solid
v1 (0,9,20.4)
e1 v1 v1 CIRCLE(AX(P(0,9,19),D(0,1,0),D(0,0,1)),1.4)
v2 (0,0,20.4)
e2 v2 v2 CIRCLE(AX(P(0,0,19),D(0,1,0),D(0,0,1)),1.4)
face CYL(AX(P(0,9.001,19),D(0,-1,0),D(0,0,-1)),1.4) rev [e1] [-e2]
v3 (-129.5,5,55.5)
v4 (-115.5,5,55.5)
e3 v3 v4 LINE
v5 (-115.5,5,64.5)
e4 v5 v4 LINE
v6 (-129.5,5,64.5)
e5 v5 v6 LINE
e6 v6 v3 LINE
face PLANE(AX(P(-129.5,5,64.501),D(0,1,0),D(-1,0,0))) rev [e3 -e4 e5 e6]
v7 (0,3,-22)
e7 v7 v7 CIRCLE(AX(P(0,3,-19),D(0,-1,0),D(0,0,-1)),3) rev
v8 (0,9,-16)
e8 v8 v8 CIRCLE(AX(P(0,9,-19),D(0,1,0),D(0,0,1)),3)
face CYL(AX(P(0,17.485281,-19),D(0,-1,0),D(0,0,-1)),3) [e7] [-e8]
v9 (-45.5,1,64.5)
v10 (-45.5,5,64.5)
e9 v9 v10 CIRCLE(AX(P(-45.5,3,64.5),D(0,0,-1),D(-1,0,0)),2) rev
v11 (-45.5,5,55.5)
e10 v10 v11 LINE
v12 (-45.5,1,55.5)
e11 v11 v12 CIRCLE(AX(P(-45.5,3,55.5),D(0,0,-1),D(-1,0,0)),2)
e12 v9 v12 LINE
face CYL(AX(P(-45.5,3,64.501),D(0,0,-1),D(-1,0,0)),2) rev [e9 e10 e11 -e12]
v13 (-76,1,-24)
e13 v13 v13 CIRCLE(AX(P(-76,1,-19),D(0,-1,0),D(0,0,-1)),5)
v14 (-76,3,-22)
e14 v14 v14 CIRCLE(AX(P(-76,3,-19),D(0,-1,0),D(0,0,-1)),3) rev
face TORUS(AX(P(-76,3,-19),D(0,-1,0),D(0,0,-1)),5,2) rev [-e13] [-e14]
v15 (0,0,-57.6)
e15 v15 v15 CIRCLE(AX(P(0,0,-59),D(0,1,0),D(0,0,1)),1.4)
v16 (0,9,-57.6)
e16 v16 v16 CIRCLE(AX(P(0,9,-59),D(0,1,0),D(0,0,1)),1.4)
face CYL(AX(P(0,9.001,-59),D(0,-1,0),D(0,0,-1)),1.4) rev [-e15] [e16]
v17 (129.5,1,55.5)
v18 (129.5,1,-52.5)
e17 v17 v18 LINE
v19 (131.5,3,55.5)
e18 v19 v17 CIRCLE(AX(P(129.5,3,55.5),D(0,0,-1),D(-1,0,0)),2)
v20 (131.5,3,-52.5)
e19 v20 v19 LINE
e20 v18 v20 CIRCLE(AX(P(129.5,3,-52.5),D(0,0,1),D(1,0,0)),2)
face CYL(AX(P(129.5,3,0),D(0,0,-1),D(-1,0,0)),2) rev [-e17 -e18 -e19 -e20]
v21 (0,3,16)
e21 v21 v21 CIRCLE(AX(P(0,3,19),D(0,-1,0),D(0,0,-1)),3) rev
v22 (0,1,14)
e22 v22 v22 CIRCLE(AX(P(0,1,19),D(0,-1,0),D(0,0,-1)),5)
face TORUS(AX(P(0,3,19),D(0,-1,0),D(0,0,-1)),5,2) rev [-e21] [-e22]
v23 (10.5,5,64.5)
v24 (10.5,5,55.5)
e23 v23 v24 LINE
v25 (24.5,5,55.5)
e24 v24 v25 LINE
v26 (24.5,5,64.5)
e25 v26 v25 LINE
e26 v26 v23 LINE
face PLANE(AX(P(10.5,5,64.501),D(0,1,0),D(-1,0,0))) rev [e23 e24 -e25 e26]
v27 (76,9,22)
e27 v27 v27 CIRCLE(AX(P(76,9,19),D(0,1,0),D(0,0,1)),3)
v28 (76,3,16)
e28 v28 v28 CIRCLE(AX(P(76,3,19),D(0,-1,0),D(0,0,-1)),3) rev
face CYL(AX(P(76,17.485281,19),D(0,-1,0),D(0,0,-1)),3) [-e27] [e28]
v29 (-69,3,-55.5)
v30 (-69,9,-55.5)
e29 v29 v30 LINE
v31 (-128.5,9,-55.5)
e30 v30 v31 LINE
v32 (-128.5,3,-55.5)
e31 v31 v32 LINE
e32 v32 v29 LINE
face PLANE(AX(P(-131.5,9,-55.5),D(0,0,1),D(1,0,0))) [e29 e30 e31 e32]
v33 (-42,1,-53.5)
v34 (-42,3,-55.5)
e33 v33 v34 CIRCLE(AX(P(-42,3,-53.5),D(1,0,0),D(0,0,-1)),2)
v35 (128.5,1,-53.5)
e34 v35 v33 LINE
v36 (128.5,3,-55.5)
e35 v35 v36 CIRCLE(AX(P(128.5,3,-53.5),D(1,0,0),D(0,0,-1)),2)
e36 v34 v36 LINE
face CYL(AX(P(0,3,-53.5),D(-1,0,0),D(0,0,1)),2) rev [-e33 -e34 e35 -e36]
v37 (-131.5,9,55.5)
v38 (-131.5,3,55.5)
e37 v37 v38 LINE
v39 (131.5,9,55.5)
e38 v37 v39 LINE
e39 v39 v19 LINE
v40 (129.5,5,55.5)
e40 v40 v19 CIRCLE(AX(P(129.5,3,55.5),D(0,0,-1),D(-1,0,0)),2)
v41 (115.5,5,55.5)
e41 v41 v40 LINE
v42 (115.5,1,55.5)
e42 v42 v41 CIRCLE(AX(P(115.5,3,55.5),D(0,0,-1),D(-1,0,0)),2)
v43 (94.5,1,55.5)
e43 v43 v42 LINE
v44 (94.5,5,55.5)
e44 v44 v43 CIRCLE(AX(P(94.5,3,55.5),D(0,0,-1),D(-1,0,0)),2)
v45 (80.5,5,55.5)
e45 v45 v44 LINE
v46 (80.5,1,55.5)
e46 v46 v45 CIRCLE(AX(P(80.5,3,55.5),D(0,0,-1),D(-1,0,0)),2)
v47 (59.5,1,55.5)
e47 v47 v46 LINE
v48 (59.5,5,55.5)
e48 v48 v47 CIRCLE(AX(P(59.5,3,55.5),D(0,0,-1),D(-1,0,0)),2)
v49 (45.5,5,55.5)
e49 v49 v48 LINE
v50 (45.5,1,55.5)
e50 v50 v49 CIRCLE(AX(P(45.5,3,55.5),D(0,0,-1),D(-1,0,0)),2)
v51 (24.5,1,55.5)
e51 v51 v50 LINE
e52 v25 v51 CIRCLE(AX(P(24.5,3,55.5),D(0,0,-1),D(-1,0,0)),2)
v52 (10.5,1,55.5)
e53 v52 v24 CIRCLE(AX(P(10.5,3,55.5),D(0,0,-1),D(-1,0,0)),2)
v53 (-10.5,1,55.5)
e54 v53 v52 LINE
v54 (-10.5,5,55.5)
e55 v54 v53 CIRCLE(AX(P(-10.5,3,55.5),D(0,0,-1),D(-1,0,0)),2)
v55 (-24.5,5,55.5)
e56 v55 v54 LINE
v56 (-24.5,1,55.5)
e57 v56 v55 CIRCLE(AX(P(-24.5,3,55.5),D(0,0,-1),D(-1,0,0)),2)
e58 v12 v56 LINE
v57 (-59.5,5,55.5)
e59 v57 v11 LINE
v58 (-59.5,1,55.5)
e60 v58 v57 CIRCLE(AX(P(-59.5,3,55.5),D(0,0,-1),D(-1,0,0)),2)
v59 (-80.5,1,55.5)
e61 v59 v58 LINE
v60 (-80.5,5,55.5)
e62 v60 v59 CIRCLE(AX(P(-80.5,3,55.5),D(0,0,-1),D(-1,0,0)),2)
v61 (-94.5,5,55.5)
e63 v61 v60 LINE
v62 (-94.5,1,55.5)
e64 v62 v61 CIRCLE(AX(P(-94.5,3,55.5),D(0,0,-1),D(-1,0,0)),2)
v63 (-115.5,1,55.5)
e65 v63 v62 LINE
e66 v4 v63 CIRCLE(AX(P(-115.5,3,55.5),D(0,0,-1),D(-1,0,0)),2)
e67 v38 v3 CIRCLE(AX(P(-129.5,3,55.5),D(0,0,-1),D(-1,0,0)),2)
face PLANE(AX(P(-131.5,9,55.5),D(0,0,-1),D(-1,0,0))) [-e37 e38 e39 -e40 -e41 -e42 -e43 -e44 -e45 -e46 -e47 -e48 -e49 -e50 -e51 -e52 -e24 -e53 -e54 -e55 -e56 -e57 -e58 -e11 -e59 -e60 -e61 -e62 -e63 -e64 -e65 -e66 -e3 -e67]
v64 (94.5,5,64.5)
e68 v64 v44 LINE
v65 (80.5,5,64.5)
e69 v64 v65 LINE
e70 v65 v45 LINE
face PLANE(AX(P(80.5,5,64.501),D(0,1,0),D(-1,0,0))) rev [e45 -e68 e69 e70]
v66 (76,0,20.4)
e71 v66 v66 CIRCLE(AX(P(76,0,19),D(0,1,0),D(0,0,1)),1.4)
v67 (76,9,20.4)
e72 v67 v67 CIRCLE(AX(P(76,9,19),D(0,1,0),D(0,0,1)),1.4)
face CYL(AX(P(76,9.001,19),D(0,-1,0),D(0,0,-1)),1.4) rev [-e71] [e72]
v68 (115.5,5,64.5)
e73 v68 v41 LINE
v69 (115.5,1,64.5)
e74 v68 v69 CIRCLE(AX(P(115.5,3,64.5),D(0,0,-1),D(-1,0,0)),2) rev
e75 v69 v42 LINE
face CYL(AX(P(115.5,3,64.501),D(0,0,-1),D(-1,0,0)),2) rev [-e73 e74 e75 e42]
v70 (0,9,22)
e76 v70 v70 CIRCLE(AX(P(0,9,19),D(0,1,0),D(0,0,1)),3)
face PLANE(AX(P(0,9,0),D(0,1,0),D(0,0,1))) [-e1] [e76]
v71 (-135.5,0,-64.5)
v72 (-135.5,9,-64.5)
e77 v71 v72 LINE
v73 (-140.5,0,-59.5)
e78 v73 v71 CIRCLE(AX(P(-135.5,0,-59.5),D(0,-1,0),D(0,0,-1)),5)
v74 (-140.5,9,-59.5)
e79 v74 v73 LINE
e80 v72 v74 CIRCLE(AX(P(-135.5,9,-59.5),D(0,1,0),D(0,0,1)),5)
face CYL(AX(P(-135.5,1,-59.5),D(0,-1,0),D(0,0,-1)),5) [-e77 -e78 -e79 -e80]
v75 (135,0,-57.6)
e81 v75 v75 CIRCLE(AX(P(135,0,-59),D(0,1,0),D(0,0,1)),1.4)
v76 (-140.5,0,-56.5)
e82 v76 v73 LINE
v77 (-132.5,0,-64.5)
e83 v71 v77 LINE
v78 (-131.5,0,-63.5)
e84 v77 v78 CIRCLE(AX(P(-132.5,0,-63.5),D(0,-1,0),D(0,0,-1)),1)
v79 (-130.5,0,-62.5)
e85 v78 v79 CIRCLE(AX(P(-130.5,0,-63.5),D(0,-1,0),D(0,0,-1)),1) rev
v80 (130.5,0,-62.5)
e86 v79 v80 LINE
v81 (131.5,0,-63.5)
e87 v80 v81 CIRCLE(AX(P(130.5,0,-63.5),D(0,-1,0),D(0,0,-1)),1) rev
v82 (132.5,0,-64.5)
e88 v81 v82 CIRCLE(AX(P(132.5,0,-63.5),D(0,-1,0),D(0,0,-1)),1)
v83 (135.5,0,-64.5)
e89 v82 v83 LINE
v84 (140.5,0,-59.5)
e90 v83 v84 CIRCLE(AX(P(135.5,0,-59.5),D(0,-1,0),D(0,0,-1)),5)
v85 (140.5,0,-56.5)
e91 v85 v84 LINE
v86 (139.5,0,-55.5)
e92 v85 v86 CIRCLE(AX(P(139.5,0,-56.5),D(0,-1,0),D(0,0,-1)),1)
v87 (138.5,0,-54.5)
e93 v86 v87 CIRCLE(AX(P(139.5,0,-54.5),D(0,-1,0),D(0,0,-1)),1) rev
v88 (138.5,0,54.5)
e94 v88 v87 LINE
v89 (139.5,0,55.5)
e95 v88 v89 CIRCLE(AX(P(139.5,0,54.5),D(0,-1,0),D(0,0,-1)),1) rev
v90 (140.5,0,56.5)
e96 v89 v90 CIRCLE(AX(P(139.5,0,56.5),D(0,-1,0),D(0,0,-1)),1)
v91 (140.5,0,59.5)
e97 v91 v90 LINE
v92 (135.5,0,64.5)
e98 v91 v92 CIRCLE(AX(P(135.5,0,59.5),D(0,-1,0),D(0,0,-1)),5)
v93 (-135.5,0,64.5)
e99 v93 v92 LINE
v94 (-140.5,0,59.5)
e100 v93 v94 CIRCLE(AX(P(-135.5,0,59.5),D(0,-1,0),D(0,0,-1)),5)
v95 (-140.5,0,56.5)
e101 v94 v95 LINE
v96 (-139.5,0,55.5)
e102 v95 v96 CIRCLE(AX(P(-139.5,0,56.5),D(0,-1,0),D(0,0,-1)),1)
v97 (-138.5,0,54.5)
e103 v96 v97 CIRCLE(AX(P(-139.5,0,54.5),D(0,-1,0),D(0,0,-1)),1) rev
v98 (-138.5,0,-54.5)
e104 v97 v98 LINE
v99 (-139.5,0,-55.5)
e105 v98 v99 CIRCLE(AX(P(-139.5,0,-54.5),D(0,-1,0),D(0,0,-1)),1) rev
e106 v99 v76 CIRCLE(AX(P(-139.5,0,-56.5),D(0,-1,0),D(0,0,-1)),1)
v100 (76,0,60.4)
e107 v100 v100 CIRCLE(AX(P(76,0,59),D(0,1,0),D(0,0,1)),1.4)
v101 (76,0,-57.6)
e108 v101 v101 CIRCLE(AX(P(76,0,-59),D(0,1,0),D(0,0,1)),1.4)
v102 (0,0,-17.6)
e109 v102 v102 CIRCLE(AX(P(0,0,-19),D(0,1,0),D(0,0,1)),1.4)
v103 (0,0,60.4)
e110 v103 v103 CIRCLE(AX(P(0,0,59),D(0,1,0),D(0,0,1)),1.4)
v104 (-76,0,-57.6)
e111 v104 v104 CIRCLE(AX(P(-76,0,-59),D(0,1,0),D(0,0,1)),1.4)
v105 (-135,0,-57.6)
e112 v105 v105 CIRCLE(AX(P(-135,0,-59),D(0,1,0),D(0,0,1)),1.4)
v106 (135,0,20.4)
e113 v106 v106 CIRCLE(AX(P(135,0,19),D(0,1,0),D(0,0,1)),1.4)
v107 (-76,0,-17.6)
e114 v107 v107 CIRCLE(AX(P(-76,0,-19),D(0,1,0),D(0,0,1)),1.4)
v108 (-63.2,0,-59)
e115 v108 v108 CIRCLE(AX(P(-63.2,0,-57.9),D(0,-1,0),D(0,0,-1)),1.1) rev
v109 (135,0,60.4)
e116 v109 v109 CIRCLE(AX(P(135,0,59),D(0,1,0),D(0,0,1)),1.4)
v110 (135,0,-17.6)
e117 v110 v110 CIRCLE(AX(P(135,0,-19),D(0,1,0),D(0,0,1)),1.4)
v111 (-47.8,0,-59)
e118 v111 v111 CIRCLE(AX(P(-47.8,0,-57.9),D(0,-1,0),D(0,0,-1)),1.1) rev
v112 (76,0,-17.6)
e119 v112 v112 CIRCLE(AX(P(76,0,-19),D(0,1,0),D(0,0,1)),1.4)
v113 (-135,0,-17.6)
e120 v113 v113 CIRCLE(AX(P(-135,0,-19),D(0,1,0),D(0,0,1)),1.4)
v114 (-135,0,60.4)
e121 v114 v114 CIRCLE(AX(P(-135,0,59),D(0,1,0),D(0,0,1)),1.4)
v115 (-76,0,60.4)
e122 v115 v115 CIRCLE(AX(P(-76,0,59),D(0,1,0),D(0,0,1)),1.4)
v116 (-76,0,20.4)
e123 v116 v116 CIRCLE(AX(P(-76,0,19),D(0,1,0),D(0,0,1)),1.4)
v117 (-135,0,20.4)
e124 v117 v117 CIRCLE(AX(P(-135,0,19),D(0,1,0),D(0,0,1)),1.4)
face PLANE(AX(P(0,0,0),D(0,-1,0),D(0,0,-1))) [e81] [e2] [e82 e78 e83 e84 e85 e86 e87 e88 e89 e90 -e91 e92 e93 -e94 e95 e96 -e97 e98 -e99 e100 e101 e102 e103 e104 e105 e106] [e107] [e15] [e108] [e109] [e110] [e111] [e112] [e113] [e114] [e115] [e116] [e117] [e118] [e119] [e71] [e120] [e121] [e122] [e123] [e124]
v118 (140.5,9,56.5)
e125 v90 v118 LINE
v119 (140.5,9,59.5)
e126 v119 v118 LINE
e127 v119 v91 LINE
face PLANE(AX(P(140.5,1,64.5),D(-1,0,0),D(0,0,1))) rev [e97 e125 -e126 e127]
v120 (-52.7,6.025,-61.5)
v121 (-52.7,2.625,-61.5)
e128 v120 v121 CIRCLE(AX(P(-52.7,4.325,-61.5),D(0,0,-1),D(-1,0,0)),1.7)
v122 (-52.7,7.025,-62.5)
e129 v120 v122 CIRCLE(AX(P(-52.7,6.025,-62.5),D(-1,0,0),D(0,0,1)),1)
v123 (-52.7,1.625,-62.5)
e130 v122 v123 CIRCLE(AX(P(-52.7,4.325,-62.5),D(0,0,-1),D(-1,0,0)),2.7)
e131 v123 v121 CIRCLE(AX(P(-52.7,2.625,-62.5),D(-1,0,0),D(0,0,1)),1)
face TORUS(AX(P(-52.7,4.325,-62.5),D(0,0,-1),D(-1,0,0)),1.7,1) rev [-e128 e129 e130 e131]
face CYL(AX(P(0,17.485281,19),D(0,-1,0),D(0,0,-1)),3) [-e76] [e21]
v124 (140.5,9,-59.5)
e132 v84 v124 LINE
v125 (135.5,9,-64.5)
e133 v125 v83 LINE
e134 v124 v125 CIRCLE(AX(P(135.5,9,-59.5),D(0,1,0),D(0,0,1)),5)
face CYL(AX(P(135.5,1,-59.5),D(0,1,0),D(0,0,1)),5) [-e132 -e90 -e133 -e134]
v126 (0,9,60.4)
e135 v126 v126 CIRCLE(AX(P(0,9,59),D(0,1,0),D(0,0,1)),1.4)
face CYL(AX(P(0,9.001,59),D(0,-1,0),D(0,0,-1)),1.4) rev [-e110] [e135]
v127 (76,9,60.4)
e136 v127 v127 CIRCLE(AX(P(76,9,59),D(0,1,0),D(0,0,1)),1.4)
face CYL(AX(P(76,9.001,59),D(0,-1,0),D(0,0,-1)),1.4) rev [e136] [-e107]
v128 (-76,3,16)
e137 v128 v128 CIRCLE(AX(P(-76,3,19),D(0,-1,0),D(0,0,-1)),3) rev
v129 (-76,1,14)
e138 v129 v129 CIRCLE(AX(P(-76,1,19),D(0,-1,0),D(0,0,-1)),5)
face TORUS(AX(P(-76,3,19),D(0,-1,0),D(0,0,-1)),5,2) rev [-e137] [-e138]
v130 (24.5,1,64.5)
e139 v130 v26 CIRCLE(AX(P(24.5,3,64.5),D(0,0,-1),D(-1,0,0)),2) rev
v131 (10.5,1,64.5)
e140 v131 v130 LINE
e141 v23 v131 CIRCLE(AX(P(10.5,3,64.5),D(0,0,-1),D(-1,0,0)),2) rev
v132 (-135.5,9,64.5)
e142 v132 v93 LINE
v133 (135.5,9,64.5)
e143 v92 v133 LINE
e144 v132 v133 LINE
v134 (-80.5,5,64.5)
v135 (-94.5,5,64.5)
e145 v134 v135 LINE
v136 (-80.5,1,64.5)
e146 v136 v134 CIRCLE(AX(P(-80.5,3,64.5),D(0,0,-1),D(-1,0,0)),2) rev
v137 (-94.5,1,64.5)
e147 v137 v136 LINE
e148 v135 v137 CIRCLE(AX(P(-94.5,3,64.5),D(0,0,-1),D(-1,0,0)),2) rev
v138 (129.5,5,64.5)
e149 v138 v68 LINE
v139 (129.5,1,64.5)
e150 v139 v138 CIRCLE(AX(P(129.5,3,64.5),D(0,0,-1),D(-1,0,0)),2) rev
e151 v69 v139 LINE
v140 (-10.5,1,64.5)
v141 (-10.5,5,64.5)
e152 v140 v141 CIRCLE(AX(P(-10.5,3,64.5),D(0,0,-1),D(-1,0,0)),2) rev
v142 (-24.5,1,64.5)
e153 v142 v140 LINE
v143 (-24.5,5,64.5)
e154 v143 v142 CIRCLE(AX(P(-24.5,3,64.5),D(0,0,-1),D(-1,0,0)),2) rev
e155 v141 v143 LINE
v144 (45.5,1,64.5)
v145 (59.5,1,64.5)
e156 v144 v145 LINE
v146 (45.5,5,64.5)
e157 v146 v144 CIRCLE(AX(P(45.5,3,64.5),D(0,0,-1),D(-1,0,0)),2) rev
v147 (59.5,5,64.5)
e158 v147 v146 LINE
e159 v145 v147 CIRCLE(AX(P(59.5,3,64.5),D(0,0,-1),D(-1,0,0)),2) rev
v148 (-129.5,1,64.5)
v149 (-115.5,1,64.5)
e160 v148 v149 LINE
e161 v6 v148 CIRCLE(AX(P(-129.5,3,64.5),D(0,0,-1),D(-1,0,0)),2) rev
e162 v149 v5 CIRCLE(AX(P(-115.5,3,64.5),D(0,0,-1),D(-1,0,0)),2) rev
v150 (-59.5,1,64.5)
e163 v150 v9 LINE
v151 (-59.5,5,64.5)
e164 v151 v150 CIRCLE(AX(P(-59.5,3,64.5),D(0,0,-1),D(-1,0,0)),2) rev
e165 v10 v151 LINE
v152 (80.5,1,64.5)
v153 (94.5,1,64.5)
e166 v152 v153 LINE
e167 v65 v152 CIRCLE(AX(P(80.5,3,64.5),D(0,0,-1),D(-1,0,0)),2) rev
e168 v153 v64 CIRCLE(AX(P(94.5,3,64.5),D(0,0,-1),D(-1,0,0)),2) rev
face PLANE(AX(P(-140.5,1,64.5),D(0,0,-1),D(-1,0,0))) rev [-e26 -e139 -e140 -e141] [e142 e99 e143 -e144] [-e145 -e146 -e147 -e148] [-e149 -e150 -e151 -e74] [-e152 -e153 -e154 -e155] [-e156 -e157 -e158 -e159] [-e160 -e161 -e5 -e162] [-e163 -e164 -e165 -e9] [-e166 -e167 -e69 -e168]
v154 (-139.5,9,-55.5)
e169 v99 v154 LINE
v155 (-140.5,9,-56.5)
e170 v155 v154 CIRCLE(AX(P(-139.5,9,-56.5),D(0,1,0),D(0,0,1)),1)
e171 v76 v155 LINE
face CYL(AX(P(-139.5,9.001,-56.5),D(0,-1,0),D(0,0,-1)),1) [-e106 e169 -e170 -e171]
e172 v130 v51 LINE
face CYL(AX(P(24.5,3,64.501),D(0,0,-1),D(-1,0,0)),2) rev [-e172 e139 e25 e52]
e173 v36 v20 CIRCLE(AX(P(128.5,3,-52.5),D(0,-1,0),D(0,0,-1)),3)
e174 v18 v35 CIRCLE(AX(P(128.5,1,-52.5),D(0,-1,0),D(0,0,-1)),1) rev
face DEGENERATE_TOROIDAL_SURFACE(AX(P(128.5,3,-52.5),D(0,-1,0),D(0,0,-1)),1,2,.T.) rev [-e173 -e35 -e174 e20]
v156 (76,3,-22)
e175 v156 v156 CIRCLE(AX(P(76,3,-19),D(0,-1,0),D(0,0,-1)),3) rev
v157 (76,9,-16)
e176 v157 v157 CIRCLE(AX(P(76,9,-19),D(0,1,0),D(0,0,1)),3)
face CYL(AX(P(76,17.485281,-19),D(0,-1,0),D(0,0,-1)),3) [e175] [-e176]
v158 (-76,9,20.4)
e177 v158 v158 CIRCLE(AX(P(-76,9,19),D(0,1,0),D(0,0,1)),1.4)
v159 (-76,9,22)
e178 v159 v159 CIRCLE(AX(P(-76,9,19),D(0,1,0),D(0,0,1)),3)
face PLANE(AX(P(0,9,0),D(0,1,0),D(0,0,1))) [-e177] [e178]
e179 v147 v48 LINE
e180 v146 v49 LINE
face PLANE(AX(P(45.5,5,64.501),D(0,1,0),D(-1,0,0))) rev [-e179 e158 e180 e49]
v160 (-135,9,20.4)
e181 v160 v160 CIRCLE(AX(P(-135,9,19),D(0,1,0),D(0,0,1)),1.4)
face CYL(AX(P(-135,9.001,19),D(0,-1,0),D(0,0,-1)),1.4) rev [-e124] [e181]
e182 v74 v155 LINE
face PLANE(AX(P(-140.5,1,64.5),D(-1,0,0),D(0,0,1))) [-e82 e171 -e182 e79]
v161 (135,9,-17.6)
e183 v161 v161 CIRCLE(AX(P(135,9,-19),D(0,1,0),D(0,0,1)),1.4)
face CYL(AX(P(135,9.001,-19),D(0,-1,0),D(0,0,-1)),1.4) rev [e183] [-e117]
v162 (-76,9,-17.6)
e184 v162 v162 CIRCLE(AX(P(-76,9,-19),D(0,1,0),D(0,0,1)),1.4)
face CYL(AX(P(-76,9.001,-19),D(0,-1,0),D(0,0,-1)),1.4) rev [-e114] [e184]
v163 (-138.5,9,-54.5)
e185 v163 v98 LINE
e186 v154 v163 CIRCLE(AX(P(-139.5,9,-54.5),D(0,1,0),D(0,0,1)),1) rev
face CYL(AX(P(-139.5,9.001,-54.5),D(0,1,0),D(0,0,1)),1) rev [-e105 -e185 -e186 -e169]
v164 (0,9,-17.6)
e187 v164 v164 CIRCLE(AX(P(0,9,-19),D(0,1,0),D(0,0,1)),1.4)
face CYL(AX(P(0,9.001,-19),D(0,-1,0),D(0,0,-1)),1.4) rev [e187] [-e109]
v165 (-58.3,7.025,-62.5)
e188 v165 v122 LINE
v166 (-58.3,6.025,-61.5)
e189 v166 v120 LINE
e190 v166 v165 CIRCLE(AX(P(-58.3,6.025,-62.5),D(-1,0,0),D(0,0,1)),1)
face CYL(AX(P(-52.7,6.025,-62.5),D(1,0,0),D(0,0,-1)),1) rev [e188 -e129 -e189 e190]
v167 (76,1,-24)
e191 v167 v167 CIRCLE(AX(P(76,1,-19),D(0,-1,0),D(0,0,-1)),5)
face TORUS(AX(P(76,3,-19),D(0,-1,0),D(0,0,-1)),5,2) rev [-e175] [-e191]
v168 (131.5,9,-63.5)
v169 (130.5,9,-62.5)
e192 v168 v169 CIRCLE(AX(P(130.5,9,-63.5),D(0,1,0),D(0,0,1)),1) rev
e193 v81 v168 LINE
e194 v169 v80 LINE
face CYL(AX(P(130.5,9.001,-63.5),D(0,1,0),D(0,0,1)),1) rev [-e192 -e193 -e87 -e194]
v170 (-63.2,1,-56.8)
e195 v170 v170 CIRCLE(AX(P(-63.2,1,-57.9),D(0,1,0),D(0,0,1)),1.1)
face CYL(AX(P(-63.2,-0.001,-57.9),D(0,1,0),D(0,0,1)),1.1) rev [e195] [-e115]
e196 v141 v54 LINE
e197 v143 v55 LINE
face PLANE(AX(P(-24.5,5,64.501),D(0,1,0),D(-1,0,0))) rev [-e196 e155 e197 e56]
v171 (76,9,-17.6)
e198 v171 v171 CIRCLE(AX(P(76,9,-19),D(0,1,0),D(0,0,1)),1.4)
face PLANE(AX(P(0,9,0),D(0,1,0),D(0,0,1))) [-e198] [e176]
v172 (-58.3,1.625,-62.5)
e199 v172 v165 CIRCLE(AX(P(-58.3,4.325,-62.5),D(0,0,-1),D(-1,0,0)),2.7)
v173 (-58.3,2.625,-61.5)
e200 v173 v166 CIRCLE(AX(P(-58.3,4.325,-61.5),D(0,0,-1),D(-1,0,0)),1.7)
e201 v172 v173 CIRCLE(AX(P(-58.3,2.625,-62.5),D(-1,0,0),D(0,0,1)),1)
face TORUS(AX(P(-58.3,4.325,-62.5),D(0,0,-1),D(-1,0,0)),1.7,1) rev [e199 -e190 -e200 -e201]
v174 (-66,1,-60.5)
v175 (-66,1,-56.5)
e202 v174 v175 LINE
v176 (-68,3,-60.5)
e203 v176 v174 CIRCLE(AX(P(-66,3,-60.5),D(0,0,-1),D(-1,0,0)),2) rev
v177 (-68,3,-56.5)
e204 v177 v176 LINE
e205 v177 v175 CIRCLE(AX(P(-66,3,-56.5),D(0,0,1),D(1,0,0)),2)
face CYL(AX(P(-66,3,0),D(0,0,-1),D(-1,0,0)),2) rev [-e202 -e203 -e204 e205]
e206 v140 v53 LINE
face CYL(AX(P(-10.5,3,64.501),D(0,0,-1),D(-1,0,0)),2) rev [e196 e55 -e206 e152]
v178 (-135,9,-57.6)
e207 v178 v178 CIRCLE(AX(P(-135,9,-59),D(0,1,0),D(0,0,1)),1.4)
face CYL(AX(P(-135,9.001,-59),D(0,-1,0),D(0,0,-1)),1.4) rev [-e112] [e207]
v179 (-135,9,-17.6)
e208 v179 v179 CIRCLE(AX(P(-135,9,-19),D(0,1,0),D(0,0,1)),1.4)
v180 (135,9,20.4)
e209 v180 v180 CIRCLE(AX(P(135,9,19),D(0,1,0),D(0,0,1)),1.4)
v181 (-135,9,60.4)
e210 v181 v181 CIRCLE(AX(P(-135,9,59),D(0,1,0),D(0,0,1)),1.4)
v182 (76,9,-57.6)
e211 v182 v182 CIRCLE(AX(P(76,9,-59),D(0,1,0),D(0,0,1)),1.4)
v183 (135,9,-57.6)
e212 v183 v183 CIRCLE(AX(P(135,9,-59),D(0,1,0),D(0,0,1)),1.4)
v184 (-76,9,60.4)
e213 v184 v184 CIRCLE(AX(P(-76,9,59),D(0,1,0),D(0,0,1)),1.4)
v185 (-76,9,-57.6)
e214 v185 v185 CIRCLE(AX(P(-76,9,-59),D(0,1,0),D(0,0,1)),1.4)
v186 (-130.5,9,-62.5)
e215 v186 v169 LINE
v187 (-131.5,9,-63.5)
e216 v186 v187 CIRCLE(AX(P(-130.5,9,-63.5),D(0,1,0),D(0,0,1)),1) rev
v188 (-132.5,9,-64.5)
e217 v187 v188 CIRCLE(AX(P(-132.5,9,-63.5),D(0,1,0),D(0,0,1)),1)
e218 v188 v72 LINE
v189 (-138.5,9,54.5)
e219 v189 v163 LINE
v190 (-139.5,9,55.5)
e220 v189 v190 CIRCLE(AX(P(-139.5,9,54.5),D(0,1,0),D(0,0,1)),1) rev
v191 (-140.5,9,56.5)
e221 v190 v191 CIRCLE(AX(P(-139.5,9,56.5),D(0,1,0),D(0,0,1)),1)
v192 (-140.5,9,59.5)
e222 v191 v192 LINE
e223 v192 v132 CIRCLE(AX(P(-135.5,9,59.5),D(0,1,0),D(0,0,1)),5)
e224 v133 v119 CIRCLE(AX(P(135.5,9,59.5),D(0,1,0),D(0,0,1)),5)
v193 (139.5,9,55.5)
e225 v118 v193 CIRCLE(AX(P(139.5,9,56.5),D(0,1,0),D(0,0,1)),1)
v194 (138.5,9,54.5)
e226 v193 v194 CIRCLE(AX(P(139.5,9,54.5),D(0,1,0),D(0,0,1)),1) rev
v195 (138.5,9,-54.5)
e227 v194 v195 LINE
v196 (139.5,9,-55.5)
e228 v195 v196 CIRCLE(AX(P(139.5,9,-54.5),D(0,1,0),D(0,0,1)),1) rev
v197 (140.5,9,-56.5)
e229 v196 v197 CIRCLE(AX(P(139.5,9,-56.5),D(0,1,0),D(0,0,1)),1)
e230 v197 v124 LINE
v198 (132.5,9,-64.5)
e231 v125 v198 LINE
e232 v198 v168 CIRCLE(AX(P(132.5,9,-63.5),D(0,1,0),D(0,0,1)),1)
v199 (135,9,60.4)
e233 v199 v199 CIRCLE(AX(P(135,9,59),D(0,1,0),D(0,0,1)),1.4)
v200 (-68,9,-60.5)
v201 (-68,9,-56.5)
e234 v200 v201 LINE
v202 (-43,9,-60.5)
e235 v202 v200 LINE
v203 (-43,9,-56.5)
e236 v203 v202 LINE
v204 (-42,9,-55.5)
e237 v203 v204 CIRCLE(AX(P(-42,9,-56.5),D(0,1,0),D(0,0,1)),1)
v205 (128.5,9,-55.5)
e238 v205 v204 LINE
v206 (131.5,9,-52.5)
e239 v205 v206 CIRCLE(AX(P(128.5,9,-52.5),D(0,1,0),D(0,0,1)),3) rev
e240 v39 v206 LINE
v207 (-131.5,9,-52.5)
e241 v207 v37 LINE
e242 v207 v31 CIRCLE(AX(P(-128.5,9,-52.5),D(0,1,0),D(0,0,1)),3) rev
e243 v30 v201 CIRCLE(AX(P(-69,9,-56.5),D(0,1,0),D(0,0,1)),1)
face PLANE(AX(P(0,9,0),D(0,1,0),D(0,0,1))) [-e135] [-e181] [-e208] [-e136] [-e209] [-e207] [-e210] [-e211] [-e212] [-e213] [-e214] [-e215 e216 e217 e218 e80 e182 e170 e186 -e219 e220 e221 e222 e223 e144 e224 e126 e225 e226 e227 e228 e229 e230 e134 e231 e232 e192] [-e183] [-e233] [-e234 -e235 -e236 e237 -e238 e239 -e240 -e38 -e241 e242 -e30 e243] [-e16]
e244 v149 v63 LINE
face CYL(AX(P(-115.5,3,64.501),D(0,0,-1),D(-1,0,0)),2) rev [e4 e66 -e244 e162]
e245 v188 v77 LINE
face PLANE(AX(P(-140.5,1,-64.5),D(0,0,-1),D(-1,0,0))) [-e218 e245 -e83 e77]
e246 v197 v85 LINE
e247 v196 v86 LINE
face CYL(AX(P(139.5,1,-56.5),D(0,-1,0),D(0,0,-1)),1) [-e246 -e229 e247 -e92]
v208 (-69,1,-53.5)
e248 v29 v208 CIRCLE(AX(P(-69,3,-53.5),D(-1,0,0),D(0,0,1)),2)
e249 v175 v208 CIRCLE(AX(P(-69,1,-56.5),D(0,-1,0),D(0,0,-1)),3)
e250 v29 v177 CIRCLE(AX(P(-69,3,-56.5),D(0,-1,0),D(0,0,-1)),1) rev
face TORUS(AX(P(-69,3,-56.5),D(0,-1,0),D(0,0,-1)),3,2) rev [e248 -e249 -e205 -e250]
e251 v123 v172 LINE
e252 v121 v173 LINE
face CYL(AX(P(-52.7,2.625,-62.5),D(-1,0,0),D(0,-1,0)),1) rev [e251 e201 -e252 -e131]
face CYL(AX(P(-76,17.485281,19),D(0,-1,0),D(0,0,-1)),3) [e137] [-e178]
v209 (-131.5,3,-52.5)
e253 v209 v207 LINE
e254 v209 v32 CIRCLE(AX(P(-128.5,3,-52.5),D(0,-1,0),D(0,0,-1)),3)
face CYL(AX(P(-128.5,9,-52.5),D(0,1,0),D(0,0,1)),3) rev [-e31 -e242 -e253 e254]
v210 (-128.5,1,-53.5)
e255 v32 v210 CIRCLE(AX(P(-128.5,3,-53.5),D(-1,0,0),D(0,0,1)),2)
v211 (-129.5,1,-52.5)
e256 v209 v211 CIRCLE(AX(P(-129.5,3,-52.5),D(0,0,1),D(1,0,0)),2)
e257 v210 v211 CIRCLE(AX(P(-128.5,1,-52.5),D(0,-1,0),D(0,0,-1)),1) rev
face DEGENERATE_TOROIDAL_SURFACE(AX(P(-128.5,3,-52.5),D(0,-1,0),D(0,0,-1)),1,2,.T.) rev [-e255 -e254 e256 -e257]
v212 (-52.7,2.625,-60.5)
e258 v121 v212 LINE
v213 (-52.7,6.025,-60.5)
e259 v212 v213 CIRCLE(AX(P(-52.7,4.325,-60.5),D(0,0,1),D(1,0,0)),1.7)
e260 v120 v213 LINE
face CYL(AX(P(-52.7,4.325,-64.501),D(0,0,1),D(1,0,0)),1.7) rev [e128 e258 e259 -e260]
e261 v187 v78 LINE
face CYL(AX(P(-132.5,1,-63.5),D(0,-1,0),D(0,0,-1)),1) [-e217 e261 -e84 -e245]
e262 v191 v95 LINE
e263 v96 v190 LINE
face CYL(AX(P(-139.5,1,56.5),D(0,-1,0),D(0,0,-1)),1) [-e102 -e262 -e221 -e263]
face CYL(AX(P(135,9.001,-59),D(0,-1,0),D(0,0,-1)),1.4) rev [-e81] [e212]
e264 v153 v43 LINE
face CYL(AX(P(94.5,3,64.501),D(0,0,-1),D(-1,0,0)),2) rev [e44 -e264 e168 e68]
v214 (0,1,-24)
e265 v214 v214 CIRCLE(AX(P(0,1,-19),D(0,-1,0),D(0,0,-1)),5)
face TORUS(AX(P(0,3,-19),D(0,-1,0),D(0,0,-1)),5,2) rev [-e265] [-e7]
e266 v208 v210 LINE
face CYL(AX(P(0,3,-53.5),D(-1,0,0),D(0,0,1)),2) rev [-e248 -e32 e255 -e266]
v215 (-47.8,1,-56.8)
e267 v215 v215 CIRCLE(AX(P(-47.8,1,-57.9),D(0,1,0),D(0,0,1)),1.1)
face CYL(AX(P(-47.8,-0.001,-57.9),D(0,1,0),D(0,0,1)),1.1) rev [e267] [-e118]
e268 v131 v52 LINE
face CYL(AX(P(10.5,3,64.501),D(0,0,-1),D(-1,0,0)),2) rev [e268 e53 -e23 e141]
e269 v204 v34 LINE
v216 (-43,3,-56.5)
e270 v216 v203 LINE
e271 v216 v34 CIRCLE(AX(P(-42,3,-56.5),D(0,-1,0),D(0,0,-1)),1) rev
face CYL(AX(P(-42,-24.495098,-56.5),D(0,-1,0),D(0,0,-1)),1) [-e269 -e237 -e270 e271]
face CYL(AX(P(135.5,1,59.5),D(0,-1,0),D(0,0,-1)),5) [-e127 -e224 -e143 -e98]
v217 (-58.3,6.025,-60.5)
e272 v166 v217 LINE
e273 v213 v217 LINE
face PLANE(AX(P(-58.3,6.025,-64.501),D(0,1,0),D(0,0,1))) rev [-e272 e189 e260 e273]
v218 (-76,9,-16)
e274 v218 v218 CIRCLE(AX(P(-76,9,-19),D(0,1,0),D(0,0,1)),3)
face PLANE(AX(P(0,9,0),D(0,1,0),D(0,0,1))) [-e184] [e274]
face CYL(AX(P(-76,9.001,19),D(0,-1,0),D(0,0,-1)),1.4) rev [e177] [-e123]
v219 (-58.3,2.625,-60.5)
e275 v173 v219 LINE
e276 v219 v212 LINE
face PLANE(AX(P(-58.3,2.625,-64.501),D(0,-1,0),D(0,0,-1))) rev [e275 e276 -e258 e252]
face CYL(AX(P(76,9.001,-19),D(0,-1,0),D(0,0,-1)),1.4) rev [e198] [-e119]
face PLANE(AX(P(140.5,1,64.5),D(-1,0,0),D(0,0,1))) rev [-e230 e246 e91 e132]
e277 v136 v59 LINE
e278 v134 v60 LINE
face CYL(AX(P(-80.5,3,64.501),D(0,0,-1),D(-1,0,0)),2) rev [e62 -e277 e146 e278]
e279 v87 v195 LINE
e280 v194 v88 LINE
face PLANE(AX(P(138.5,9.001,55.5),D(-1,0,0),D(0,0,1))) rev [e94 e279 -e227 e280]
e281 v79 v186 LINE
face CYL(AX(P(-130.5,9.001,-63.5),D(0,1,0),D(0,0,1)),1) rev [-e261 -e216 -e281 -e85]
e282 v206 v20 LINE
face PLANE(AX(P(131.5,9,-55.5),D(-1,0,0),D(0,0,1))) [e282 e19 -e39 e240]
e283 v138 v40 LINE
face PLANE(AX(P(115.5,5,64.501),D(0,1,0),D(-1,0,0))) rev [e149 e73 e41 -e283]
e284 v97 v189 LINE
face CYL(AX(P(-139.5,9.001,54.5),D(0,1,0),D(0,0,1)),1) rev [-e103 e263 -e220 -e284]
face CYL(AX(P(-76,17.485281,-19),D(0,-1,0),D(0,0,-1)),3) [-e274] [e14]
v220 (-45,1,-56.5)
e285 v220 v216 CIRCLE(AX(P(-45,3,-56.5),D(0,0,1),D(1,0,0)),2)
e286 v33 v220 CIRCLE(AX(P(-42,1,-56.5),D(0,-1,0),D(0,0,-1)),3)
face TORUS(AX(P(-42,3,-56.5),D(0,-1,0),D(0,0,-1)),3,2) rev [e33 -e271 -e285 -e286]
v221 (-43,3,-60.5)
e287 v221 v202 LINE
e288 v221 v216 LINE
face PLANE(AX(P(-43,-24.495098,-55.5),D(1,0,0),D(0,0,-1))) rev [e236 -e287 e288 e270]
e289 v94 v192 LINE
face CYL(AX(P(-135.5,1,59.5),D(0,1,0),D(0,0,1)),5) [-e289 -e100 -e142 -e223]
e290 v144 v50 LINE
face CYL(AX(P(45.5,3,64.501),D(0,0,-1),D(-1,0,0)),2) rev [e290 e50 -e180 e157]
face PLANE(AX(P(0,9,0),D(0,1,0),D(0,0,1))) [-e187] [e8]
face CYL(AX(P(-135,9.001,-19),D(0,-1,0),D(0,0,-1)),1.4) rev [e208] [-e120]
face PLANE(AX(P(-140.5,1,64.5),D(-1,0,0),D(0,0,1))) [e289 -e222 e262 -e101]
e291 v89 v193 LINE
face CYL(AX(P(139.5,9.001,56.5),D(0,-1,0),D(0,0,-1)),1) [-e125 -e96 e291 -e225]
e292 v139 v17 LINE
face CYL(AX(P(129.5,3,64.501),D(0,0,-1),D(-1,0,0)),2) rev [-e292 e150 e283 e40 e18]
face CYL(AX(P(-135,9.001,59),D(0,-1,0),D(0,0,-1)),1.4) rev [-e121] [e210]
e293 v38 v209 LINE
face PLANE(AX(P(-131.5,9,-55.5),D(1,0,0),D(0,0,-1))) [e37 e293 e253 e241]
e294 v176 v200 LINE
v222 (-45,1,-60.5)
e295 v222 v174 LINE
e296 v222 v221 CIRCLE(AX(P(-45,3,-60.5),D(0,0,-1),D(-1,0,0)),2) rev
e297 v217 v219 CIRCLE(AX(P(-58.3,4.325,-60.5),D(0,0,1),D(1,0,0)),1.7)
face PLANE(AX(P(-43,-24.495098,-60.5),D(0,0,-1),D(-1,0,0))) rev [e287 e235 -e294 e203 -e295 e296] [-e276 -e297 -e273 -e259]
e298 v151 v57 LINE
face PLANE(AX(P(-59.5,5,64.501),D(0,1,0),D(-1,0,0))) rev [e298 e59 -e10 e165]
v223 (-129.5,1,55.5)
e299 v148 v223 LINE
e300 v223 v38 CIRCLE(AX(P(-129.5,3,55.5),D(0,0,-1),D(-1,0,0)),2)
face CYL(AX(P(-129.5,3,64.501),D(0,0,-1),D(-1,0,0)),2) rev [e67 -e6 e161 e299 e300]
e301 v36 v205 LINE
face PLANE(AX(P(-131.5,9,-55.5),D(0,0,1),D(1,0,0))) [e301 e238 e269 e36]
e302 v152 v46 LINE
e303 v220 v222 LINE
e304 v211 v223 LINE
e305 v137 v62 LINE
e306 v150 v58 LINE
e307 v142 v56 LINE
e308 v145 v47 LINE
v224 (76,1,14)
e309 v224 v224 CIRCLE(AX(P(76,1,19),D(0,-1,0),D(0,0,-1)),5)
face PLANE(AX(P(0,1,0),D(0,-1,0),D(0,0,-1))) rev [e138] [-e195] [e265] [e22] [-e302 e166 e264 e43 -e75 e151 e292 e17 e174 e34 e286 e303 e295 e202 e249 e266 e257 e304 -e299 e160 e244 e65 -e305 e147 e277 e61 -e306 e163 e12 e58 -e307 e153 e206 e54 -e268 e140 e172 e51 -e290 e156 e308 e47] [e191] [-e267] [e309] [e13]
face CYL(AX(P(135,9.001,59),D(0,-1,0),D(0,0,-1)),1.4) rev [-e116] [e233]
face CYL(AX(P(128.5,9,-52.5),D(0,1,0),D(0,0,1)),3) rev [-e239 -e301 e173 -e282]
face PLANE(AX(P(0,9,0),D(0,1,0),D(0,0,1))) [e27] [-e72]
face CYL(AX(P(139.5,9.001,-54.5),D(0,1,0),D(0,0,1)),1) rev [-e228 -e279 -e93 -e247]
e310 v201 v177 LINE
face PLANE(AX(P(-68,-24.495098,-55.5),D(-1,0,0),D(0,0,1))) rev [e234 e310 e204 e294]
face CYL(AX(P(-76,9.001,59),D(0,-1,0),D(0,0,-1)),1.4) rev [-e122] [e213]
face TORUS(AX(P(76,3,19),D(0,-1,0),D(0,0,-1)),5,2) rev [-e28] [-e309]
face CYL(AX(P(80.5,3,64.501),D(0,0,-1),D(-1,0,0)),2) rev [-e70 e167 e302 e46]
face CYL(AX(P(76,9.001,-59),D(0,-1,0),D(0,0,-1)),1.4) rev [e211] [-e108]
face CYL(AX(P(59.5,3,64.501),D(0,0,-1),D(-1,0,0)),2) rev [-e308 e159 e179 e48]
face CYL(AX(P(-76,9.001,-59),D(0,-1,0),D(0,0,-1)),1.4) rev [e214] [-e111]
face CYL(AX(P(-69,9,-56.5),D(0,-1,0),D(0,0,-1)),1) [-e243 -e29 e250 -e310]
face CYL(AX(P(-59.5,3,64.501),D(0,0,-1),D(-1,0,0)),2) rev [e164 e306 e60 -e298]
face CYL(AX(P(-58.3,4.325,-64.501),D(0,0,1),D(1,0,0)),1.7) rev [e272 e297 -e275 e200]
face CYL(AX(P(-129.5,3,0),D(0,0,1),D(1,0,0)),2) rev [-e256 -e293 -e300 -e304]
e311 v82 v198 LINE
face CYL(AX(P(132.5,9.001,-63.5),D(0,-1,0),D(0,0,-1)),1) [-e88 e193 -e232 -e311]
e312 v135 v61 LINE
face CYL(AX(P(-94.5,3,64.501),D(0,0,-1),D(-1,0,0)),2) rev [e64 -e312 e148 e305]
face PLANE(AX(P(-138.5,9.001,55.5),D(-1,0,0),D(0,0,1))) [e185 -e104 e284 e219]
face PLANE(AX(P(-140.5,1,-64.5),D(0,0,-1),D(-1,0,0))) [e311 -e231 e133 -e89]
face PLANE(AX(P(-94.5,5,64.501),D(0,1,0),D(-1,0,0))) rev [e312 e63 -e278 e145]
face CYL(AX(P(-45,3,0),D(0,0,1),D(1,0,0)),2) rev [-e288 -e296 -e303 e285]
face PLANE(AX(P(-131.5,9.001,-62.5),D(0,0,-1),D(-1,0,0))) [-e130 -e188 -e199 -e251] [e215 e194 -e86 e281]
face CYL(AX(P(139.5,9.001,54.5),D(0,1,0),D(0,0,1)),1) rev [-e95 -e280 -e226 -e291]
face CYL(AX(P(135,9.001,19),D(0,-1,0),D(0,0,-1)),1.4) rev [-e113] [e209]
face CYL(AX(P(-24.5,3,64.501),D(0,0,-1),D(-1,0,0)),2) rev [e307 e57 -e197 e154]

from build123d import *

# Parameters (mm, degrees)
SKETCH1_W               = 281
SKETCH1_H               = 129
BOSS_EXTRUDE1_DEPTH     = 1
SKETCH2_W               = 281
SKETCH2_H               = 129
SKETCH2_W_2             = 263
SKETCH2_H_2             = 111
BOSS_EXTRUDE2_DEPTH     = 8
CUT_EXTRUDE1_REACH      = 156.86
SKETCH3_R               = 1.4
SKETCH16_R              = 3
SKETCH16_R_2            = 1.4
BOSS_EXTRUDE7_DEPTH     = 8
LPATTERN1_OUTLINE_R     = 1.4
LPATTERN1_DEPTH         = 9
LPATTERN1_START         = 1
LPATTERN1_2_OUTLINE_R   = 3
LPATTERN1_2_OUTLINE_R_2 = 1.4
LPATTERN1_2_DEPTH       = 8
CUT_EXTRUDE7_REACH      = 156.86
SKETCH18_W              = 2
SKETCH18_H              = 111
CUT_EXTRUDE9_REACH      = 156.86
SKETCH19_W              = 263
SKETCH19_H              = 2
FILLET8_R               = 1
SKETCH10_W              = 25
SKETCH10_H              = 5
CUT_EXTRUDE3_DEPTH      = 8
CUT_EXTRUDE4_REACH      = 190.272
CUT_EXTRUDE5_START      = -3
CUT_EXTRUDE5_DEPTH      = 1
FILLET5_R               = 1
CUT_EXTRUDE8_REACH      = 156.805
SKETCH17_R              = 1.1
FILLET1_R               = 5
FILLET2_R               = 3
CUT_EXTRUDE2_REACH      = 186.99
LPATTERN2_COUNT         = 8
LPATTERN2_PITCH         = 35
FILLET7_R               = 1
FILLET9_R               = 2


# Read off the part's stored shape, not the designer's step: LPattern1
with BuildPart() as part:
    # Sketch1 → Boss-Extrude1 (new body)
    with BuildSketch(Plane(origin=(0, 0, 0), x_dir=(1, 0, 0), z_dir=(0, 1, 0))):
        Rectangle(SKETCH1_W, SKETCH1_H)
    extrude(amount=BOSS_EXTRUDE1_DEPTH)

    # Sketch2 → Boss-Extrude2 (add)
    with BuildSketch(Plane(origin=(0, 1, 0), x_dir=(1, 0, 0), z_dir=(0, 1, 0))):
        Rectangle(SKETCH2_W, SKETCH2_H)
        Rectangle(SKETCH2_W_2, SKETCH2_H_2, mode=Mode.SUBTRACT)
    extrude(amount=BOSS_EXTRUDE2_DEPTH)

    # Sketch3 → Cut-Extrude1 (cut, up to next)
    with BuildSketch(Plane(origin=(0, 0, 0), x_dir=(1, 0, 0), z_dir=(0, 1, 0)), mode=Mode.PRIVATE) as cut_extrude1_sk1:
        with Locations(Location((-135, 59, 0), (0, 0, 270))):
            Circle(SKETCH3_R)
    cut_extrude1_tool1 = extrude(cut_extrude1_sk1.sketch, amount=CUT_EXTRUDE1_REACH, mode=Mode.PRIVATE) & part.part
    add(cut_extrude1_tool1.solids().sort_by_distance((-135, 0, -59))[0], mode=Mode.SUBTRACT)

    # Sketch16 → Boss-Extrude7 (add)
    with BuildSketch(Plane(origin=(0, 1, 0), x_dir=(1, 0, 0), z_dir=(0, 1, 0))):
        with Locations((-135, 59)):
            Circle(SKETCH16_R)
        with Locations(Location((-135, 59, 0), (0, 0, 270))):
            Circle(SKETCH16_R_2, mode=Mode.SUBTRACT)
    extrude(amount=BOSS_EXTRUDE7_DEPTH)

    # LPattern1 outline → LPattern1 (cut)
    with BuildSketch(Plane(origin=(0, 0, 0), x_dir=(1, 0, 0), z_dir=(0, 1, 0))):
        with Locations((0, 19)):
            Circle(LPATTERN1_OUTLINE_R)
        with Locations((-76, -19)):
            Circle(LPATTERN1_OUTLINE_R)
        with Locations((-76, 19)):
            Circle(LPATTERN1_OUTLINE_R)
        with Locations((76, -19)):
            Circle(LPATTERN1_OUTLINE_R)
        with Locations((76, 19)):
            Circle(LPATTERN1_OUTLINE_R)
        with Locations((0, -19)):
            Circle(LPATTERN1_OUTLINE_R)
        with Locations((-135, 19)):
            Circle(LPATTERN1_OUTLINE_R)
        with Locations((135, -59)):
            Circle(LPATTERN1_OUTLINE_R)
        with Locations((135, -19)):
            Circle(LPATTERN1_OUTLINE_R)
        with Locations((0, 59)):
            Circle(LPATTERN1_OUTLINE_R)
        with Locations((-76, -59)):
            Circle(LPATTERN1_OUTLINE_R)
        with Locations((-76, 59)):
            Circle(LPATTERN1_OUTLINE_R)
        with Locations((-135, -59)):
            Circle(LPATTERN1_OUTLINE_R)
        with Locations((-135, -19)):
            Circle(LPATTERN1_OUTLINE_R)
        with Locations((135, 19)):
            Circle(LPATTERN1_OUTLINE_R)
        with Locations((135, 59)):
            Circle(LPATTERN1_OUTLINE_R)
        with Locations((76, -59)):
            Circle(LPATTERN1_OUTLINE_R)
        with Locations((76, 59)):
            Circle(LPATTERN1_OUTLINE_R)
        with Locations((0, -59)):
            Circle(LPATTERN1_OUTLINE_R)
    extrude(amount=LPATTERN1_DEPTH, mode=Mode.SUBTRACT)

    # LPattern1 2 outline → LPattern1 2 (add)
    # profile 1 of 6: a face of its own
    with BuildSketch(Plane(origin=(0, 0, 0), x_dir=(1, 0, 0), z_dir=(0, 1, 0)).offset(LPATTERN1_START)):
        with Locations((-76, 19)):
            Circle(LPATTERN1_2_OUTLINE_R)
        with Locations((-76, 19)):
            Circle(LPATTERN1_2_OUTLINE_R_2, mode=Mode.SUBTRACT)
    # profile 2 of 6: a face of its own
    with BuildSketch(Plane(origin=(0, 0, 0), x_dir=(1, 0, 0), z_dir=(0, 1, 0)).offset(LPATTERN1_START)):
        with Locations((-76, -19)):
            Circle(LPATTERN1_2_OUTLINE_R)
        with Locations((-76, -19)):
            Circle(LPATTERN1_2_OUTLINE_R_2, mode=Mode.SUBTRACT)
    # profile 3 of 6: a face of its own
    with BuildSketch(Plane(origin=(0, 0, 0), x_dir=(1, 0, 0), z_dir=(0, 1, 0)).offset(LPATTERN1_START)):
        with Locations((0, 19)):
            Circle(LPATTERN1_2_OUTLINE_R)
        with Locations((0, 19)):
            Circle(LPATTERN1_2_OUTLINE_R_2, mode=Mode.SUBTRACT)
    # profile 4 of 6: a face of its own
    with BuildSketch(Plane(origin=(0, 0, 0), x_dir=(1, 0, 0), z_dir=(0, 1, 0)).offset(LPATTERN1_START)):
        with Locations((0, -19)):
            Circle(LPATTERN1_2_OUTLINE_R)
        with Locations((0, -19)):
            Circle(LPATTERN1_2_OUTLINE_R_2, mode=Mode.SUBTRACT)
    # profile 5 of 6: a face of its own
    with BuildSketch(Plane(origin=(0, 0, 0), x_dir=(1, 0, 0), z_dir=(0, 1, 0)).offset(LPATTERN1_START)):
        with Locations((76, 19)):
            Circle(LPATTERN1_2_OUTLINE_R)
        with Locations((76, 19)):
            Circle(LPATTERN1_2_OUTLINE_R_2, mode=Mode.SUBTRACT)
    # profile 6 of 6: a face of its own
    with BuildSketch(Plane(origin=(0, 0, 0), x_dir=(1, 0, 0), z_dir=(0, 1, 0)).offset(LPATTERN1_START)):
        with Locations((76, -19)):
            Circle(LPATTERN1_2_OUTLINE_R)
        with Locations((76, -19)):
            Circle(LPATTERN1_2_OUTLINE_R_2, mode=Mode.SUBTRACT)
    extrude(amount=LPATTERN1_2_DEPTH)

    # Sketch18 → Cut-Extrude7 (cut, up to next)
    with BuildSketch(Plane(origin=(0, 0, 0), x_dir=(1, 0, 0), z_dir=(0, 1, 0)), mode=Mode.PRIVATE) as cut_extrude7_sk1:
        with Locations((-139.5, 0)):
            Rectangle(SKETCH18_W, SKETCH18_H)
    cut_extrude7_tool1 = extrude(cut_extrude7_sk1.sketch, amount=CUT_EXTRUDE7_REACH, mode=Mode.PRIVATE) & part.part
    cut_extrude7 = cut_extrude7_tool1.solids().sort_by_distance((-139.5, 0, 0))[0]
    add(cut_extrude7, mode=Mode.SUBTRACT)

    # Mirror1: Cut-Extrude7 across plane
    add(cut_extrude7.mirror(Plane(origin=(0, 0, 0), x_dir=(0, 0, 1), z_dir=(1, 0, 0))), mode=Mode.SUBTRACT)

    # Sketch19 → Cut-Extrude9 (cut, up to next)
    with BuildSketch(Plane(origin=(0, 0, 0), x_dir=(1, 0, 0), z_dir=(0, 1, 0)), mode=Mode.PRIVATE) as cut_extrude9_sk1:
        with Locations((0, 63.5)):
            Rectangle(SKETCH19_W, SKETCH19_H)
    cut_extrude9_tool1 = extrude(cut_extrude9_sk1.sketch, amount=CUT_EXTRUDE9_REACH, mode=Mode.PRIVATE) & part.part
    add(cut_extrude9_tool1.solids().sort_by_distance((0, 0, -63.5))[0], mode=Mode.SUBTRACT)

    # Fillet8
    fillet8_edges = [part.edges().sort_by_distance(p)[0] for p in [
        (-138.5, 4.5, -55.5),
        (138.5, 4.5, 55.5),
        (138.5, 4.5, -55.5),
        (-138.5, 4.5, 55.5),
        (131.5, 4.5, -62.5),
        (-131.5, 4.5, -62.5),
    ]]
    fillet(fillet8_edges, radius=FILLET8_R)
    fillet8_2_edges = [part.edges().sort_by_distance(p)[0] for p in [
        (-140.5, 4.5, -55.5),
        (140.5, 4.5, 55.5),
        (140.5, 4.5, -55.5),
        (-140.5, 4.5, 55.5),
        (131.5, 4.5, -64.5),
        (-131.5, 4.5, -64.5),
    ]]
    fillet(fillet8_2_edges, radius=FILLET8_R - 0.0001)  # a hair under: the kernel refuses the full size

    # Sketch10 → Cut-Extrude3 (cut)
    with BuildSketch(Plane(origin=(0, 9, 0), x_dir=(1, 0, 0), z_dir=(0, 1, 0))):
        with Locations((-55.5, 58)):
            Rectangle(SKETCH10_W, SKETCH10_H)
    extrude(amount=-CUT_EXTRUDE3_DEPTH, mode=Mode.SUBTRACT)

    # Sketch13 → Cut-Extrude4 (cut, up to next)
    with BuildSketch(Plane.XY.offset(-60.5), mode=Mode.PRIVATE) as cut_extrude4_sk1:
        with BuildLine():
            Line((-58.3, 6.025), (-52.7, 6.025))
            ThreePointArc((-52.7, 6.025), (-51, 4.325), (-52.7, 2.625))
            Line((-52.7, 2.625), (-58.3, 2.625))
            ThreePointArc((-58.3, 2.625), (-60, 4.325), (-58.3, 6.025))
        make_face()
    cut_extrude4_tool1 = extrude(cut_extrude4_sk1.sketch, amount=-CUT_EXTRUDE4_REACH, mode=Mode.PRIVATE) & part.part
    add(cut_extrude4_tool1.solids().sort_by_distance((-55.5, 4.325, -60.5))[0], mode=Mode.SUBTRACT)

    # Sketch15 → Cut-Extrude5 (cut)
    with BuildSketch(Plane(origin=(0, 0, -64.5), x_dir=(-1, 0, 0), z_dir=(0, 0, -1)).offset(CUT_EXTRUDE5_START)):
        with BuildLine():
            Line((52.7, 1.625), (58.3, 1.625))
            ThreePointArc((58.3, 1.625), (61, 4.325), (58.3, 7.025))
            Line((58.3, 7.025), (52.7, 7.025))
            ThreePointArc((52.7, 7.025), (50, 4.325), (52.7, 1.625))
        make_face()
        with BuildLine():
            Line((52.7, 2.625), (58.3, 2.625))
            ThreePointArc((58.3, 2.625), (60, 4.325), (58.3, 6.025))
            Line((58.3, 6.025), (52.7, 6.025))
            ThreePointArc((52.7, 6.025), (51, 4.325), (52.7, 2.625))
        make_face(mode=Mode.SUBTRACT)
    extrude(amount=CUT_EXTRUDE5_DEPTH, mode=Mode.SUBTRACT)

    # Fillet5
    fillet5_edges = [part.edges().sort_by_distance(p)[0] for p in [
        (-50, 4.325, -61.5),
        (-55.5, 7.025, -61.5),
        (-61, 4.325, -61.5),
        (-55.5, 1.625, -61.5),
    ]]
    fillet(fillet5_edges, radius=FILLET5_R - 0.0001)  # a hair under: the kernel refuses the full size

    # Sketch17 → Cut-Extrude8 (cut, up to next)
    with BuildSketch(Plane(origin=(0, 1, 0), x_dir=(1, 0, 0), z_dir=(0, 1, 0)), mode=Mode.PRIVATE) as cut_extrude8_sk1:
        with Locations(Location((-47.8, 57.9, 0), (0, 0, 270))):
            Circle(SKETCH17_R)
    cut_extrude8_tool1 = extrude(cut_extrude8_sk1.sketch, amount=-CUT_EXTRUDE8_REACH, mode=Mode.PRIVATE) & part.part
    # Sketch17 → Cut-Extrude8 (cut, up to next)
    with BuildSketch(Plane(origin=(0, 1, 0), x_dir=(1, 0, 0), z_dir=(0, 1, 0)), mode=Mode.PRIVATE) as cut_extrude8_sk2:
        with Locations(Location((-63.2, 57.9, 0), (0, 0, 270))):
            Circle(SKETCH17_R)
    cut_extrude8_tool2 = extrude(cut_extrude8_sk2.sketch, amount=-CUT_EXTRUDE8_REACH, mode=Mode.PRIVATE) & part.part
    add(cut_extrude8_tool1.solids().sort_by_distance((-47.8, 1, -57.9))[0], mode=Mode.SUBTRACT)
    add(cut_extrude8_tool2.solids().sort_by_distance((-63.2, 1, -57.9))[0], mode=Mode.SUBTRACT)

    # Fillet1
    fillet1_edges = [part.edges().sort_by_distance(p)[0] for p in [
        (-140.5, 4.5, 64.5),
        (140.5, 4.5, 64.5),
        (140.5, 4.5, -64.5),
        (-140.5, 4.5, -64.5),
    ]]
    fillet(fillet1_edges, radius=FILLET1_R)

    # Fillet2
    fillet2_edges = [part.edges().sort_by_distance(p)[0] for p in [
        (131.5, 5, -55.5),
        (-131.5, 5, -55.5),
    ]]
    fillet(fillet2_edges, radius=FILLET2_R)

    # Sketch7 → Cut-Extrude2 (cut, up to next)
    with BuildSketch(Plane(origin=(0, 0, 55.5), x_dir=(-1, 0, 0), z_dir=(0, 0, -1)), mode=Mode.PRIVATE) as cut_extrude2_sk1:
        with BuildLine():
            Line((129.5, 1), (115.5, 1))
            ThreePointArc((115.5, 1), (113.5, 3), (115.5, 5))
            Line((115.5, 5), (129.5, 5))
            ThreePointArc((129.5, 5), (131.5, 3), (129.5, 1))
        make_face()
    cut_extrude2_tool1 = extrude(cut_extrude2_sk1.sketch, amount=-CUT_EXTRUDE2_REACH, mode=Mode.PRIVATE) & part.part
    cut_extrude2 = cut_extrude2_tool1.solids().sort_by_distance((-122.5, 3, 55.5))[0]
    add(cut_extrude2, mode=Mode.SUBTRACT)

    # LPattern2: Cut-Extrude2 ×8
    with Locations(*[(i * LPATTERN2_PITCH, 0, 0) for i in range(1, LPATTERN2_COUNT)]):
        add(cut_extrude2, mode=Mode.SUBTRACT)

    # Fillet7
    fillet7_edges = [part.edges().sort_by_distance(p)[0] for p in [
        (-68, 5, -55.5),
        (-43, 5, -55.5),
    ]]
    fillet(fillet7_edges, radius=FILLET7_R)

    # Fillet9
    fillet9_edges = [part.edges().sort_by_distance(p)[0] for p in [
        (-43, 1, -58.5),
        (-42.707106781, 1, -55.792893219),
        (43.25, 1, -55.5),
        (130.621320344, 1, -54.621320344),
        (-68, 1, -58.5),
        (-68.292893219, 1, -55.792893219),
        (-98.75, 1, -55.5),
        (-130.621320344, 1, -54.621320344),
        (-79, 1, -19),
        (-79, 1, 19),
        (-3, 1, 19),
        (-3, 1, -19),
        (73, 1, -19),
        (73, 1, 19),
        (131.5, 1, 1.5),
        (-131.5, 1, 1.5),
    ]]
    fillet(fillet9_edges, radius=FILLET9_R)


solid = part.part
